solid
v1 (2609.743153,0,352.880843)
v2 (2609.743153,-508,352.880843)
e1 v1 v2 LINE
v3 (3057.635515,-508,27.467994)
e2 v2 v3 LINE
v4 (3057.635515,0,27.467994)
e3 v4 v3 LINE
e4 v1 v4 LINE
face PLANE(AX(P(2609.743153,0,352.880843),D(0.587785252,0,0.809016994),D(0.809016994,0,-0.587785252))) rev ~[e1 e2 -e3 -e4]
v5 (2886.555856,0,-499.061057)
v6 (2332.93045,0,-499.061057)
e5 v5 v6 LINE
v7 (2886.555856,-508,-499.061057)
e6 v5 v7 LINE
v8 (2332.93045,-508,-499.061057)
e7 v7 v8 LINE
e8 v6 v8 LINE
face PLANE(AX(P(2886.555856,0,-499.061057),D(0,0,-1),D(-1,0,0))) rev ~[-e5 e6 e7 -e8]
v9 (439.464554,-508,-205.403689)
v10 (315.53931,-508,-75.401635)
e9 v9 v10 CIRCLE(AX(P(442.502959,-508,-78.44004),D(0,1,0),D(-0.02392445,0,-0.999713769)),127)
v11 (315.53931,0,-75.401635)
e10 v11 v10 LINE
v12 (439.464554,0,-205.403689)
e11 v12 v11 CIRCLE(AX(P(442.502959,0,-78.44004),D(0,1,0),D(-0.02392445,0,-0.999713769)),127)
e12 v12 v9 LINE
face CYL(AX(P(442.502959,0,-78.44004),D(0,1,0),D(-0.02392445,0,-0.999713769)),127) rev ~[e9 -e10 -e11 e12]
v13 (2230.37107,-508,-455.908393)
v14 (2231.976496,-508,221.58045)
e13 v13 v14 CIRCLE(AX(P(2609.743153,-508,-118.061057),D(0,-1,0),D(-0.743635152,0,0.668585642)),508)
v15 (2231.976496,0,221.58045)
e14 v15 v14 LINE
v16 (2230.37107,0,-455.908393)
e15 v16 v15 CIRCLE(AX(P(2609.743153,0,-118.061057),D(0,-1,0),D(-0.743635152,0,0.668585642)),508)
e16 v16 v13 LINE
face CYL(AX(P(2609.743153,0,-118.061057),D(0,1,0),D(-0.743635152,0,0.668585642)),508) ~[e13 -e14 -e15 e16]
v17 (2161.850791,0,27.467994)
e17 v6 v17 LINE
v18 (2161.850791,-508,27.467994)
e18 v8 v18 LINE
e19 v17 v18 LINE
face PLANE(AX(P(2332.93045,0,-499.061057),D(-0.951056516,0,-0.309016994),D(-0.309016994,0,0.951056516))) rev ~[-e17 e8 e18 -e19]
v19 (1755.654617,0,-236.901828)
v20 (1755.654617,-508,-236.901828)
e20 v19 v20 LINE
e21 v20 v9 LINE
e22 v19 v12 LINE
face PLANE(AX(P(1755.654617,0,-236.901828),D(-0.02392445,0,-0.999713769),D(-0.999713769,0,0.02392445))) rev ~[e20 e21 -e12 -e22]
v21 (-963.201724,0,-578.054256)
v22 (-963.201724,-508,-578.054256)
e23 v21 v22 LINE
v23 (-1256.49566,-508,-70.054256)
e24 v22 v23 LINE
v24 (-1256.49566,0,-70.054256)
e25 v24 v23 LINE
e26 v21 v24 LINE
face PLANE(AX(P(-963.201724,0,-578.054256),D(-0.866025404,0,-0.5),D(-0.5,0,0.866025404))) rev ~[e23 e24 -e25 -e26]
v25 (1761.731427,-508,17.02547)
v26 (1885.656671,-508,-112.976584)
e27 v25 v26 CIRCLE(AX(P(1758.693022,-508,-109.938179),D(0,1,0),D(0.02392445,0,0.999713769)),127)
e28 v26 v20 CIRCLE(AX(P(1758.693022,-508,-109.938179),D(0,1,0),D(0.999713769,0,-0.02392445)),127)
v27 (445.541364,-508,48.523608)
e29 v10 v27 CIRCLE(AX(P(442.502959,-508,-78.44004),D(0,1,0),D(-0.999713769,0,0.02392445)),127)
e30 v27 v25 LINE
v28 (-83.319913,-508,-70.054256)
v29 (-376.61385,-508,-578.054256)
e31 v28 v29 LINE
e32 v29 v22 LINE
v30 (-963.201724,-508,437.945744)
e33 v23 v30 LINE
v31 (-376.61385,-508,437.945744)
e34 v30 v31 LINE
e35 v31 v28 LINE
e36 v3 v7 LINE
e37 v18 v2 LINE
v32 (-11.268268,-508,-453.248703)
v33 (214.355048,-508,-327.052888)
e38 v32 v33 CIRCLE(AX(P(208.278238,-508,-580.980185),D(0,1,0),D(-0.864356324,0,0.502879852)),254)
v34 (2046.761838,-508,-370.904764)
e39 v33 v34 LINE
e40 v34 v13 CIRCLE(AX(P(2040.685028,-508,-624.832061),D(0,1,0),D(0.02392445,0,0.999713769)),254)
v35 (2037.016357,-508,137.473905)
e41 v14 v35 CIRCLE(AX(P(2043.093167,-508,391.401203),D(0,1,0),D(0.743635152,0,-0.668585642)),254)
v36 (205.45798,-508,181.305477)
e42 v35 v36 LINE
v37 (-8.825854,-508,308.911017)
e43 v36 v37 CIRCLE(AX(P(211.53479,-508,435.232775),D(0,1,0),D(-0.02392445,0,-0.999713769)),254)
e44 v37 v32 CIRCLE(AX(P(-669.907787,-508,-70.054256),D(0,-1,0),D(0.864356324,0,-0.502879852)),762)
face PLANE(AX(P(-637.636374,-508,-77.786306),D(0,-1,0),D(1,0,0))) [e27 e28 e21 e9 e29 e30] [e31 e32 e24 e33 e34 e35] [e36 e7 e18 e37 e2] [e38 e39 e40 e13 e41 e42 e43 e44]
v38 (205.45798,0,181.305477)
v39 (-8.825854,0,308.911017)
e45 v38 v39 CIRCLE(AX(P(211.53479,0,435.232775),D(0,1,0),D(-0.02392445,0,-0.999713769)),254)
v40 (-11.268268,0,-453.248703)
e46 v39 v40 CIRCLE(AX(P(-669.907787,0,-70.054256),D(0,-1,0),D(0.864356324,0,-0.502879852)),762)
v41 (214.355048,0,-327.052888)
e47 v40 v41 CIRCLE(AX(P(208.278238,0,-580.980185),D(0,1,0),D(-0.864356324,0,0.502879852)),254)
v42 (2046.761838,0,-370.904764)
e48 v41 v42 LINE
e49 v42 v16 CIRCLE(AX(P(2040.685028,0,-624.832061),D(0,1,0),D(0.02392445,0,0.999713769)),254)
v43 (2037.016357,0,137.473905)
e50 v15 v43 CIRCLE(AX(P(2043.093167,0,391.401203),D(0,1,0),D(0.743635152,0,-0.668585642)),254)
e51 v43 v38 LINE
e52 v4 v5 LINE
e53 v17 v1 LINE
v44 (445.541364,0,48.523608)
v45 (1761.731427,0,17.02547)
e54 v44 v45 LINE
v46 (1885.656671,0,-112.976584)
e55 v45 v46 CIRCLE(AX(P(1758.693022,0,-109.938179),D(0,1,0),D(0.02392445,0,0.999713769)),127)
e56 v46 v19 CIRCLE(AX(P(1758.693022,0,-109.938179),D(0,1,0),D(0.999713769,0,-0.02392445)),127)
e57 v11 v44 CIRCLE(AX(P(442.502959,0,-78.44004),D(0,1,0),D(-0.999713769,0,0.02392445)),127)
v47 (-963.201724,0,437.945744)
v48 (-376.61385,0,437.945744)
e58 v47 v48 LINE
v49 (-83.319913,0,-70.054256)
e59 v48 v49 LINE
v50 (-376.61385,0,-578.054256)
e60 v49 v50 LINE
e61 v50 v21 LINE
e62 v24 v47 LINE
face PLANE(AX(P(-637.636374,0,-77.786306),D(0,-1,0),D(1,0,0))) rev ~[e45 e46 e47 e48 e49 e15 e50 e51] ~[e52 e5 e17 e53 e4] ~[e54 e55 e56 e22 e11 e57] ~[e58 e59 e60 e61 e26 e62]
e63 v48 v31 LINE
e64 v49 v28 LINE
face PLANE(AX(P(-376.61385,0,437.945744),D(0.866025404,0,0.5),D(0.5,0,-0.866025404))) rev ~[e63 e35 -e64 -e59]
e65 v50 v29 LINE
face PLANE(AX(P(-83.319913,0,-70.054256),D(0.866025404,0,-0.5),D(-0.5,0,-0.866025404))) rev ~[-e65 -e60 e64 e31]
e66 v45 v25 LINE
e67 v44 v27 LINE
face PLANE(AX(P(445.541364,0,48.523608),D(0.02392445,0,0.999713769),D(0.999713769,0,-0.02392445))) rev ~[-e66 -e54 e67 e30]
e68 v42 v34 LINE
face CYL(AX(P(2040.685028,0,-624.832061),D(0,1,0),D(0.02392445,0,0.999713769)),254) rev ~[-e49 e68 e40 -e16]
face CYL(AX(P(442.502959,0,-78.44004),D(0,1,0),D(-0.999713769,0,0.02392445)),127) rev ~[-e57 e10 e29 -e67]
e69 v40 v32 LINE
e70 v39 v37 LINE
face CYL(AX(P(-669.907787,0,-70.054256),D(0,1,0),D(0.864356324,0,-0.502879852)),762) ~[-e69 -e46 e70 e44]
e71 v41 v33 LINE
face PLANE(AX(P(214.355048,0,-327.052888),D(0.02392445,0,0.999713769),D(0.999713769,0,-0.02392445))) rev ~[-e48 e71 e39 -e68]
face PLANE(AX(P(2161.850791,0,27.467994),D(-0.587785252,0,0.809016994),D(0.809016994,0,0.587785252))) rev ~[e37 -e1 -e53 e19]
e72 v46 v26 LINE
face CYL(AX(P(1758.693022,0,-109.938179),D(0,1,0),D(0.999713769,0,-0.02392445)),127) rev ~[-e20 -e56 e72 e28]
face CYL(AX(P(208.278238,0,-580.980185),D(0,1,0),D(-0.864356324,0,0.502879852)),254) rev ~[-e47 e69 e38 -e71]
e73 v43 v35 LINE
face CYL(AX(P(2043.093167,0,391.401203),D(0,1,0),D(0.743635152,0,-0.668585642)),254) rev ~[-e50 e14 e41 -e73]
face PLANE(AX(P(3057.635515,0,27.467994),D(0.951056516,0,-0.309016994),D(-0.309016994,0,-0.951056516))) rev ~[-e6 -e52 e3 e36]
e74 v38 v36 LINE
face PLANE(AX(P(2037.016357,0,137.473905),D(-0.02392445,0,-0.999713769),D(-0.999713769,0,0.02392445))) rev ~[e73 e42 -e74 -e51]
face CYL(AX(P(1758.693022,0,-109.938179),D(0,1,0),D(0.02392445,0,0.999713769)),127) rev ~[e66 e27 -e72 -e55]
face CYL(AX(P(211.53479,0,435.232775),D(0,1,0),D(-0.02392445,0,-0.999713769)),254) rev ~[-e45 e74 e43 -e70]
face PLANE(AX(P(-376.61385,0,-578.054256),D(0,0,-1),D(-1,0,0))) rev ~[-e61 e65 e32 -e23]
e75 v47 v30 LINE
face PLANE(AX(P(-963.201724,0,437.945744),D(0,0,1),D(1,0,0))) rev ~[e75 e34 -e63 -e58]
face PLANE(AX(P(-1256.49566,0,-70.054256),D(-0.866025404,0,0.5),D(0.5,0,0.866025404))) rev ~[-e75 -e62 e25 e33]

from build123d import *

# Parameters (mm, degrees)
F1_DEPTH = 508


# Not quite as in the source:
# - a feature names something its author has since deleted; it is built from what else it names


with BuildPart() as f1:
    # F0 (on Front) → F1 (new body)
    with BuildSketch(Plane.XZ):
        with BuildLine():
            ThreePointArc((90.8717905063, -26.9446916266), (60.5867734993, 146.7906129627), (-8.8258541664, 308.9110170961))
            ThreePointArc((-8.8258541664, 308.9110170961), (-1431.9038743199, -67.6123663617), (-11.2682681042, -453.2487029361))
            ThreePointArc((-11.2682681042, -453.2487029361), (65.7984429314, -268.4990677015), (92.0922130555, -70.0542559229))
            ThreePointArc((92.0922130555, -70.0542559229), (91.7870463114, -48.4908380293), (90.8717905063, -26.9446916266))
        make_face()
        Polygon((-83.3199134478, -70.0542559229), (-376.6138501962, -578.0542559229), (-963.2017236928, -578.0542559229), (-1256.4956604412, -70.0542559229), (-963.2017236928, 437.9457440771), (-376.6138501962, 437.9457440771), align=None, mode=Mode.SUBTRACT)
        with BuildLine():
            ThreePointArc((2230.3710697662, -455.9083929118), (2790.4957209899, -592.8162662797), (3117.7431527799, -118.0610566342))
            ThreePointArc((3117.7431527799, -118.0610566342), (2791.6202241037, 356.2644971015), (2231.9764955882, 221.5804495369))
            ThreePointArc((2231.9764955882, 221.5804495369), (2101.7445790707, -116.8572670267), (2230.3710697662, -455.9083929118))
        make_face()
        Polygon((2609.7431527799, 352.8808427932), (3057.6355150268, 27.4679936521), (2886.5558559499, -499.0610566342), (2332.9304496099, -499.0610566342), (2161.850790533, 27.4679936521), align=None, mode=Mode.SUBTRACT)
        with BuildLine():
            ThreePointArc((2230.3710697662, -455.9083929118), (2101.7445790707, -116.8572670267), (2231.9764955882, 221.5804495369))
            ThreePointArc((2231.9764955882, 221.5804495369), (2143.7064538419, 158.1782052373), (2037.0163567757, 137.4739051975))
            Line((2037.0163567757, 137.4739051975), (205.4579798763, 181.3054773441))
            ThreePointArc((205.4579798763, 181.3054773441), (81.5760518671, 216.9972910394), (-8.8258541664, 308.9110170961))
            ThreePointArc((-8.8258541664, 308.9110170961), (60.5867734993, 146.7906129627), (90.8717905063, -26.9446916266))
            ThreePointArc((90.8717905063, -26.9446916266), (91.7870463114, -48.4908380293), (92.0922130555, -70.0542559229))
            ThreePointArc((92.0922130555, -70.0542559229), (65.7984429314, -268.4990677015), (-11.2682681042, -453.2487029361))
            ThreePointArc((-11.2682681042, -453.2487029361), (84.287618689, -359.2994998742), (214.3550483926, -327.0528878488))
            Line((214.3550483925, -327.0528878488), (2046.761838476, -370.9047636255))
            ThreePointArc((2046.761838476, -370.9047636255), (2147.3957483239, -394.3351582008), (2230.3710697662, -455.9083929118))
        make_face()
        with BuildLine():
            ThreePointArc((439.4645539871, -205.4036891617), (350.5776252706, -166.0684205619), (315.5393103829, -75.4016353409))
            ThreePointArc((315.5393103829, -75.4016353409), (354.8745789827, 13.4852933757), (445.5413642038, 48.5236082633))
            Line((445.5413642038, 48.5236082633), (1761.7314269061, 17.0254696183))
            ThreePointArc((1761.7314269061, 17.0254696183), (1850.6183556226, -22.3097989815), (1885.6566705103, -112.9765842025))
            ThreePointArc((1885.6566705103, -112.9765842025), (1846.3214019105, -201.8635129191), (1755.6546166894, -236.9018278067))
            Line((1755.6546166894, -236.9018278067), (439.4645539871, -205.4036891617))
        make_face(mode=Mode.SUBTRACT)
    extrude(amount=F1_DEPTH)


solid = f1.part
